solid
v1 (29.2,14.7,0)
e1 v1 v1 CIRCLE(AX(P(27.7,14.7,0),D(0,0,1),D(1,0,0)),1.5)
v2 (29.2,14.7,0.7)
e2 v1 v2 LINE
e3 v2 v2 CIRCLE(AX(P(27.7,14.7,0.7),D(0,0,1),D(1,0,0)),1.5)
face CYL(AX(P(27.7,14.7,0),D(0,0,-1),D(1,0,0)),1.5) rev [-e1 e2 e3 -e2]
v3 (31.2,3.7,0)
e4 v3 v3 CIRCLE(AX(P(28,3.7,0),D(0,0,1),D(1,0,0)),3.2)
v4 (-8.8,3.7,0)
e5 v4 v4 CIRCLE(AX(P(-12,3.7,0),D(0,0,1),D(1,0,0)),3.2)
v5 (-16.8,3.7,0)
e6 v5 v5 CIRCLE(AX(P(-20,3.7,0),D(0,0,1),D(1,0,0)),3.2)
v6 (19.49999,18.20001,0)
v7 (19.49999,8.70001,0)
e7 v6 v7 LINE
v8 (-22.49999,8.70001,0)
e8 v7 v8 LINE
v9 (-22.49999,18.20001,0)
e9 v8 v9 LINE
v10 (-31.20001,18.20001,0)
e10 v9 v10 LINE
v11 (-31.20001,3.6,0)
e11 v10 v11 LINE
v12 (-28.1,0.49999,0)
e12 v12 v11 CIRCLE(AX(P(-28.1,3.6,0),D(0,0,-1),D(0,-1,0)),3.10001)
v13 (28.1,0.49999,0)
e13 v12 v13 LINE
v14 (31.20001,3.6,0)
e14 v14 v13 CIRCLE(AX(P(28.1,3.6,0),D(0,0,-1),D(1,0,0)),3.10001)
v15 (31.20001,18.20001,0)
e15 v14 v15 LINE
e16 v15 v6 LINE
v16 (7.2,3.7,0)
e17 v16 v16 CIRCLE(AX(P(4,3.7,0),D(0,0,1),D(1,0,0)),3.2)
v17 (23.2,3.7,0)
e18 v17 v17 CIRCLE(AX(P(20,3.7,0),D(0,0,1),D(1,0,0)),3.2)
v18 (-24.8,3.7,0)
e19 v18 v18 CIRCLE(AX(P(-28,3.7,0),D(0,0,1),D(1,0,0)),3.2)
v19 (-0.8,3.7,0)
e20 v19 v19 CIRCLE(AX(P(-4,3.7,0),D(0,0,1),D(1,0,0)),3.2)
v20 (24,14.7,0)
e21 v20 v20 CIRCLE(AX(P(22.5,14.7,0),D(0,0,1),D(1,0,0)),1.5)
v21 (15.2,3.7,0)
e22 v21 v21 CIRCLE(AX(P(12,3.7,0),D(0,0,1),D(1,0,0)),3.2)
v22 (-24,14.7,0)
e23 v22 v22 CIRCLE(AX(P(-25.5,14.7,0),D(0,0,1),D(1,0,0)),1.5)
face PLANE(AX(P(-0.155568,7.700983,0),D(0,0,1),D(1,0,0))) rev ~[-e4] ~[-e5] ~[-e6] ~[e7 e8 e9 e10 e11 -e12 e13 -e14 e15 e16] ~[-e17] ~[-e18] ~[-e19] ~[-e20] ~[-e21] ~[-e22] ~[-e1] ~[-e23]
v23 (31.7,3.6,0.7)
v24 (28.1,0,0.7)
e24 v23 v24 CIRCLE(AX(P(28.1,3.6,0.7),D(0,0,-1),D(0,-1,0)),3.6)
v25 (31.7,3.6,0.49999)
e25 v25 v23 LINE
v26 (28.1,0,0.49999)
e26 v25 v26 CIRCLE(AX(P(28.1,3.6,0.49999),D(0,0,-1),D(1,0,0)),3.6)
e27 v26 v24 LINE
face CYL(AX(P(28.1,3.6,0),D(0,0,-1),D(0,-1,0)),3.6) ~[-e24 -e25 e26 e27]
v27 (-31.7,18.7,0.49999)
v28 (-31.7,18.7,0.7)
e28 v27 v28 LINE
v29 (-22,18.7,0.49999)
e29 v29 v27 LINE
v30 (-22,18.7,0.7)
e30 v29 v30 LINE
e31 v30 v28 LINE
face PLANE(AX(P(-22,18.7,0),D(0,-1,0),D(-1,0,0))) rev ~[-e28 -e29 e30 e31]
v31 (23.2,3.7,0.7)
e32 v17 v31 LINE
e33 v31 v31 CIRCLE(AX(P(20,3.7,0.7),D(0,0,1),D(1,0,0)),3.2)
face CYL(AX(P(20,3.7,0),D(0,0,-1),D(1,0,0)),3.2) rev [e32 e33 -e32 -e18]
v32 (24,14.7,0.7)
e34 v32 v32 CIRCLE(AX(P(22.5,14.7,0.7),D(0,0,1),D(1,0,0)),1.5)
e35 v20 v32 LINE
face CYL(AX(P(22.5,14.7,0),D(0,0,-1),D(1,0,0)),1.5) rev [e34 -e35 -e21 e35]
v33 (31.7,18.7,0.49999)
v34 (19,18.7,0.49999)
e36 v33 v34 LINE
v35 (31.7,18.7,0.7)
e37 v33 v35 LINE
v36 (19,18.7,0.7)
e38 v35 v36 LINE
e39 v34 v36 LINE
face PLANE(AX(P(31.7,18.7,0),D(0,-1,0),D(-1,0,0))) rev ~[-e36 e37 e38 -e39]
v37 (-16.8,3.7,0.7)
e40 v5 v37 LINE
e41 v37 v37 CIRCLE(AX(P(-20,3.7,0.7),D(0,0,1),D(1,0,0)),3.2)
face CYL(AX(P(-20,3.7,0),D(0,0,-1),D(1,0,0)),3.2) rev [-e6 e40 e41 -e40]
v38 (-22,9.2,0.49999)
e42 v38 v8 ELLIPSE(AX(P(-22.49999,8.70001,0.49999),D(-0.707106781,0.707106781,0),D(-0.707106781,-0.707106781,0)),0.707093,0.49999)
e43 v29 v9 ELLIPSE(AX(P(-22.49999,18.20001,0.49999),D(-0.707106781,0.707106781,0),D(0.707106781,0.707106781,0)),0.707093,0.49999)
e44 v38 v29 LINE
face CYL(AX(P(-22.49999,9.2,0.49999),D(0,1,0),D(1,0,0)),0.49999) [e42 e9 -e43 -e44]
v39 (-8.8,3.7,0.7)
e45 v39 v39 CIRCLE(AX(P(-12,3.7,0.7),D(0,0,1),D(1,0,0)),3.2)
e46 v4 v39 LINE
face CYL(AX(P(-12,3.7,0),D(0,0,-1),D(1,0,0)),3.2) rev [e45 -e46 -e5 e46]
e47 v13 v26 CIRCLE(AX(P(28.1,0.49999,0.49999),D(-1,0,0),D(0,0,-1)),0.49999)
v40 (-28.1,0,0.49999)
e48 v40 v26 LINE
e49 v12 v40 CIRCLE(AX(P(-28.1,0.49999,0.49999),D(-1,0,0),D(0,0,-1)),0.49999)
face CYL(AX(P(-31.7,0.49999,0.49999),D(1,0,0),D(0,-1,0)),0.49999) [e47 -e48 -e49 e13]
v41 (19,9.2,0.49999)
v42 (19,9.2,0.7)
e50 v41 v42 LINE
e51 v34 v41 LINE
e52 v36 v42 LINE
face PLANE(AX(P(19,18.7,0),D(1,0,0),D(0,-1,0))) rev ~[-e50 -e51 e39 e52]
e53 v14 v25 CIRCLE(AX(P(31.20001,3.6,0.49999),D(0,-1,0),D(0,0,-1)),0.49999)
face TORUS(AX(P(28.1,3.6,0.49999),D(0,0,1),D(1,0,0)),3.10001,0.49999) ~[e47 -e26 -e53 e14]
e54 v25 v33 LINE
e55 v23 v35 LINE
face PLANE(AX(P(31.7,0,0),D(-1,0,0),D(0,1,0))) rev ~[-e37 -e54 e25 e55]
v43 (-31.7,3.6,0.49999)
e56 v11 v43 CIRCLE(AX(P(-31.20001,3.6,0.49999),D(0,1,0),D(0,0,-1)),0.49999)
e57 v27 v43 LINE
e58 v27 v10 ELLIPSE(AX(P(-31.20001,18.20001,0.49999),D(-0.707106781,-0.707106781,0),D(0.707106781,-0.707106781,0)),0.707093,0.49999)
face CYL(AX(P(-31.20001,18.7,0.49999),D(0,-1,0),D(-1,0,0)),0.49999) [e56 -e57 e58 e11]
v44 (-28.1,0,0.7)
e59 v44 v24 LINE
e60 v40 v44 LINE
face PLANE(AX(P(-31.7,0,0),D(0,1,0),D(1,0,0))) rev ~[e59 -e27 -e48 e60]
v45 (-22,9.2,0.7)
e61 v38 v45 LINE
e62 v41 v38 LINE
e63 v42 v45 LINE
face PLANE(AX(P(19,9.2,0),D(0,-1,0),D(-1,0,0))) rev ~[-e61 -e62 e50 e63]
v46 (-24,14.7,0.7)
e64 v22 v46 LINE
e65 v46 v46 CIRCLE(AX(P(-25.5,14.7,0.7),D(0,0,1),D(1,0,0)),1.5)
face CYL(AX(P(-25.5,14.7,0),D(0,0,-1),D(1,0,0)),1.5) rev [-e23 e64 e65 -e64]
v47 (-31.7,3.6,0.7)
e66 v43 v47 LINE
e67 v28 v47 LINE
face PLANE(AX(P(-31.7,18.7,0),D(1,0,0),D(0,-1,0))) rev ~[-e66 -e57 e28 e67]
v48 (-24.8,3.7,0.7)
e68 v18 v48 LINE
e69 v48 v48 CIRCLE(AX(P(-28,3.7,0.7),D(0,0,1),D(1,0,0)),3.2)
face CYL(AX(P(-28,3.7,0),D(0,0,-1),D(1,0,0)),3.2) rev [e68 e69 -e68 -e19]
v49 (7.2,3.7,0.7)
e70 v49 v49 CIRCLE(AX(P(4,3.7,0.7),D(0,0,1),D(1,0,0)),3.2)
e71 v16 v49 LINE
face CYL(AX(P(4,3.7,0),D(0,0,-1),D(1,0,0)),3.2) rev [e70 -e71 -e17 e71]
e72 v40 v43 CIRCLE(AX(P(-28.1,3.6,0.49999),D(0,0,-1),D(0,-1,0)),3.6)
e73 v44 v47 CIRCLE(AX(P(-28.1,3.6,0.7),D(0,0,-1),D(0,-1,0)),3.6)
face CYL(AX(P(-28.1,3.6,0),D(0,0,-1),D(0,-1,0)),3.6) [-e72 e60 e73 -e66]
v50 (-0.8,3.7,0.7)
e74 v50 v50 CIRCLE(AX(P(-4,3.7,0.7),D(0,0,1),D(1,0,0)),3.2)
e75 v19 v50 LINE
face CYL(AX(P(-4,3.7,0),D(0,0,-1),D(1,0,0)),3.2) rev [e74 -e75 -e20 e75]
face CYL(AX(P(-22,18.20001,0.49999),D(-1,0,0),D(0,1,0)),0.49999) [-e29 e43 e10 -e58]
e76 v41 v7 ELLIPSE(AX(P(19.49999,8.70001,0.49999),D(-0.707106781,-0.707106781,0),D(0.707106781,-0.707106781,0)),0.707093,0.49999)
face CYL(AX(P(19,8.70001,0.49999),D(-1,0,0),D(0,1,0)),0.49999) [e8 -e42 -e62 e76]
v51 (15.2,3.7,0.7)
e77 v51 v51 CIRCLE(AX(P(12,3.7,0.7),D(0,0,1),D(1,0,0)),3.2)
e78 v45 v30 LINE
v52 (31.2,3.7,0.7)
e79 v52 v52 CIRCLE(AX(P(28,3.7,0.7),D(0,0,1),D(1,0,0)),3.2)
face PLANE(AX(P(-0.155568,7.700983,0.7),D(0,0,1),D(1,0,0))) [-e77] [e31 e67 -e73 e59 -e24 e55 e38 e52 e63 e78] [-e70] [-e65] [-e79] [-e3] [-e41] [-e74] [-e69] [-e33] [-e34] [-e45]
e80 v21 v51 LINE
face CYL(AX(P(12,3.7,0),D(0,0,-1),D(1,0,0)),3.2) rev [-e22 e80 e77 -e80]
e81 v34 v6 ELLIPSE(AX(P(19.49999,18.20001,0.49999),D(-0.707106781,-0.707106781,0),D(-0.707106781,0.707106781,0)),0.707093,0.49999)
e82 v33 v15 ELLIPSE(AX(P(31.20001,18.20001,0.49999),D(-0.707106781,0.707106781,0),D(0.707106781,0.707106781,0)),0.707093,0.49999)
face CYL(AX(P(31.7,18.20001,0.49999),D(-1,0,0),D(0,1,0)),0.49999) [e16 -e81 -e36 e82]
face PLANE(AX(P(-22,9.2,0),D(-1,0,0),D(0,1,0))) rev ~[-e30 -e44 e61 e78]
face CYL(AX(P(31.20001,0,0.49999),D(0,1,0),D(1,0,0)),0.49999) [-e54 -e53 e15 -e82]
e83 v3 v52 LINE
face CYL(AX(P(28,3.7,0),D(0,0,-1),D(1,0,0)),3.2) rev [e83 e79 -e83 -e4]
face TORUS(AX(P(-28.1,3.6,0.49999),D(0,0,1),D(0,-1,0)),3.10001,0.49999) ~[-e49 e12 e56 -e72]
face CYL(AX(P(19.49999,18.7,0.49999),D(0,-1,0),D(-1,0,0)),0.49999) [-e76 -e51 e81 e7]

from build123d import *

# Parameters (mm, degrees)
F0_R        = 3.2
F0_R_2      = 1.5
F1_DEPTH    = 0.7
F2_R        = 0.49999
F3_T1_DEPTH = 9.7
F3_T4_ANGLE = 90
F3_T6_ANGLE = 90


# Not quite as in the source:
# - a fillet or chamfer that OpenCascade refuses, or shapes differently, is made with other operations: its cross-section is extruded or revolved along the edge and cut away or added
# - a fillet or chamfer is up to 0.001 mm smaller than in the source, because OpenCascade refuses the exact size


with BuildPart() as f1:
    # F0 (on Top) → F1 (new body)
    with BuildSketch(Plane.XY):
        Polygon((-22, 18.7), (-31.7, 18.7), (-31.7, 0), (-18.3513443917, 0), (-10.3513443917, 0), (31.7, 0), (31.7, 18.7), (19, 18.7), (19, 9.2), (-22, 9.2), align=None)
        with Locations((-28, 3.7)):
            Circle(F0_R, mode=Mode.SUBTRACT)
        with Locations((-20, 3.7)):
            Circle(F0_R, mode=Mode.SUBTRACT)
        with Locations((-12, 3.7)):
            Circle(F0_R, mode=Mode.SUBTRACT)
        with Locations((-4, 3.7)):
            Circle(F0_R, mode=Mode.SUBTRACT)
        with Locations((4, 3.7)):
            Circle(F0_R, mode=Mode.SUBTRACT)
        with Locations((12, 3.7)):
            Circle(F0_R, mode=Mode.SUBTRACT)
        with Locations((20, 3.7)):
            Circle(F0_R, mode=Mode.SUBTRACT)
        with Locations((28, 3.7)):
            Circle(F0_R, mode=Mode.SUBTRACT)
        with Locations((-25.5, 14.7)):
            Circle(F0_R_2, mode=Mode.SUBTRACT)
        with Locations((22.5, 14.7)):
            Circle(F0_R_2, mode=Mode.SUBTRACT)
        with Locations((27.7, 14.7)):
            Circle(F0_R_2, mode=Mode.SUBTRACT)
    extrude(amount=F1_DEPTH)

    # F2 (radius 0.5 in the source; OpenCascade refuses exactly that, so slightly less here)
    f2_edges = [f1.edges().sort_by_distance(p)[0] for p in [
        (-31.7, 9.35, 0),
        (0, 0, 0),
        (31.7, 9.35, 0),
        (25.35, 18.7, 0),
        (19, 13.95, 0),
        (-1.5, 9.2, 0),
        (-22, 13.95, 0),
        (-26.85, 18.7, 0),
    ]]
    fillet(f2_edges, radius=F2_R)

    # F3: fillet of radius 3.6 on 4 edges, made by hand

    # F3_s2 → F3_t1 (cut)
    with BuildSketch(Plane.XY):
        with BuildLine():
            ThreePointArc((-28.1, 0), (-30.6455844123, 1.0544155877), (-31.7, 3.6))
            Line((-31.7, 3.6), (-31.7, 0))
            Line((-31.7, 0), (-28.1, 0))
        make_face()
        with BuildLine():
            ThreePointArc((28.1, 0), (30.6455844123, 1.0544155877), (31.7, 3.6))
            Line((31.7, 3.6), (31.7, 0))
            Line((31.7, 0), (28.1, 0))
        make_face()
    extrude(amount=F3_T1_DEPTH, mode=Mode.SUBTRACT)

    # F3_s3 → F3_t4 (revolve, cut)
    with BuildSketch(Plane.YZ.offset(-28.1)):
        with BuildLine():
            ThreePointArc((0.49999, 0), (0.1464436805, 0.1464436805), (0, 0.49999))
            Line((0, 0.49999), (0, 0))
            Line((0, 0), (0.49999, 0))
        make_face()
    revolve(axis=Axis((-28.1, 3.6, 0), (0, 0, -1)), revolution_arc=F3_T4_ANGLE, mode=Mode.SUBTRACT)

    # F3_s5 → F3_t6 (revolve, cut)
    with BuildSketch(Plane.XZ.offset(-3.6)):
        with BuildLine():
            ThreePointArc((31.20001, 0), (31.5535563195, 0.1464436805), (31.7, 0.49999))
            Line((31.7, 0.49999), (31.7, 0))
            Line((31.7, 0), (31.20001, 0))
        make_face()
    revolve(axis=Axis((28.1, 3.6, 0), (0, 0, -1)), revolution_arc=F3_T6_ANGLE, mode=Mode.SUBTRACT)


solid = f1.part
